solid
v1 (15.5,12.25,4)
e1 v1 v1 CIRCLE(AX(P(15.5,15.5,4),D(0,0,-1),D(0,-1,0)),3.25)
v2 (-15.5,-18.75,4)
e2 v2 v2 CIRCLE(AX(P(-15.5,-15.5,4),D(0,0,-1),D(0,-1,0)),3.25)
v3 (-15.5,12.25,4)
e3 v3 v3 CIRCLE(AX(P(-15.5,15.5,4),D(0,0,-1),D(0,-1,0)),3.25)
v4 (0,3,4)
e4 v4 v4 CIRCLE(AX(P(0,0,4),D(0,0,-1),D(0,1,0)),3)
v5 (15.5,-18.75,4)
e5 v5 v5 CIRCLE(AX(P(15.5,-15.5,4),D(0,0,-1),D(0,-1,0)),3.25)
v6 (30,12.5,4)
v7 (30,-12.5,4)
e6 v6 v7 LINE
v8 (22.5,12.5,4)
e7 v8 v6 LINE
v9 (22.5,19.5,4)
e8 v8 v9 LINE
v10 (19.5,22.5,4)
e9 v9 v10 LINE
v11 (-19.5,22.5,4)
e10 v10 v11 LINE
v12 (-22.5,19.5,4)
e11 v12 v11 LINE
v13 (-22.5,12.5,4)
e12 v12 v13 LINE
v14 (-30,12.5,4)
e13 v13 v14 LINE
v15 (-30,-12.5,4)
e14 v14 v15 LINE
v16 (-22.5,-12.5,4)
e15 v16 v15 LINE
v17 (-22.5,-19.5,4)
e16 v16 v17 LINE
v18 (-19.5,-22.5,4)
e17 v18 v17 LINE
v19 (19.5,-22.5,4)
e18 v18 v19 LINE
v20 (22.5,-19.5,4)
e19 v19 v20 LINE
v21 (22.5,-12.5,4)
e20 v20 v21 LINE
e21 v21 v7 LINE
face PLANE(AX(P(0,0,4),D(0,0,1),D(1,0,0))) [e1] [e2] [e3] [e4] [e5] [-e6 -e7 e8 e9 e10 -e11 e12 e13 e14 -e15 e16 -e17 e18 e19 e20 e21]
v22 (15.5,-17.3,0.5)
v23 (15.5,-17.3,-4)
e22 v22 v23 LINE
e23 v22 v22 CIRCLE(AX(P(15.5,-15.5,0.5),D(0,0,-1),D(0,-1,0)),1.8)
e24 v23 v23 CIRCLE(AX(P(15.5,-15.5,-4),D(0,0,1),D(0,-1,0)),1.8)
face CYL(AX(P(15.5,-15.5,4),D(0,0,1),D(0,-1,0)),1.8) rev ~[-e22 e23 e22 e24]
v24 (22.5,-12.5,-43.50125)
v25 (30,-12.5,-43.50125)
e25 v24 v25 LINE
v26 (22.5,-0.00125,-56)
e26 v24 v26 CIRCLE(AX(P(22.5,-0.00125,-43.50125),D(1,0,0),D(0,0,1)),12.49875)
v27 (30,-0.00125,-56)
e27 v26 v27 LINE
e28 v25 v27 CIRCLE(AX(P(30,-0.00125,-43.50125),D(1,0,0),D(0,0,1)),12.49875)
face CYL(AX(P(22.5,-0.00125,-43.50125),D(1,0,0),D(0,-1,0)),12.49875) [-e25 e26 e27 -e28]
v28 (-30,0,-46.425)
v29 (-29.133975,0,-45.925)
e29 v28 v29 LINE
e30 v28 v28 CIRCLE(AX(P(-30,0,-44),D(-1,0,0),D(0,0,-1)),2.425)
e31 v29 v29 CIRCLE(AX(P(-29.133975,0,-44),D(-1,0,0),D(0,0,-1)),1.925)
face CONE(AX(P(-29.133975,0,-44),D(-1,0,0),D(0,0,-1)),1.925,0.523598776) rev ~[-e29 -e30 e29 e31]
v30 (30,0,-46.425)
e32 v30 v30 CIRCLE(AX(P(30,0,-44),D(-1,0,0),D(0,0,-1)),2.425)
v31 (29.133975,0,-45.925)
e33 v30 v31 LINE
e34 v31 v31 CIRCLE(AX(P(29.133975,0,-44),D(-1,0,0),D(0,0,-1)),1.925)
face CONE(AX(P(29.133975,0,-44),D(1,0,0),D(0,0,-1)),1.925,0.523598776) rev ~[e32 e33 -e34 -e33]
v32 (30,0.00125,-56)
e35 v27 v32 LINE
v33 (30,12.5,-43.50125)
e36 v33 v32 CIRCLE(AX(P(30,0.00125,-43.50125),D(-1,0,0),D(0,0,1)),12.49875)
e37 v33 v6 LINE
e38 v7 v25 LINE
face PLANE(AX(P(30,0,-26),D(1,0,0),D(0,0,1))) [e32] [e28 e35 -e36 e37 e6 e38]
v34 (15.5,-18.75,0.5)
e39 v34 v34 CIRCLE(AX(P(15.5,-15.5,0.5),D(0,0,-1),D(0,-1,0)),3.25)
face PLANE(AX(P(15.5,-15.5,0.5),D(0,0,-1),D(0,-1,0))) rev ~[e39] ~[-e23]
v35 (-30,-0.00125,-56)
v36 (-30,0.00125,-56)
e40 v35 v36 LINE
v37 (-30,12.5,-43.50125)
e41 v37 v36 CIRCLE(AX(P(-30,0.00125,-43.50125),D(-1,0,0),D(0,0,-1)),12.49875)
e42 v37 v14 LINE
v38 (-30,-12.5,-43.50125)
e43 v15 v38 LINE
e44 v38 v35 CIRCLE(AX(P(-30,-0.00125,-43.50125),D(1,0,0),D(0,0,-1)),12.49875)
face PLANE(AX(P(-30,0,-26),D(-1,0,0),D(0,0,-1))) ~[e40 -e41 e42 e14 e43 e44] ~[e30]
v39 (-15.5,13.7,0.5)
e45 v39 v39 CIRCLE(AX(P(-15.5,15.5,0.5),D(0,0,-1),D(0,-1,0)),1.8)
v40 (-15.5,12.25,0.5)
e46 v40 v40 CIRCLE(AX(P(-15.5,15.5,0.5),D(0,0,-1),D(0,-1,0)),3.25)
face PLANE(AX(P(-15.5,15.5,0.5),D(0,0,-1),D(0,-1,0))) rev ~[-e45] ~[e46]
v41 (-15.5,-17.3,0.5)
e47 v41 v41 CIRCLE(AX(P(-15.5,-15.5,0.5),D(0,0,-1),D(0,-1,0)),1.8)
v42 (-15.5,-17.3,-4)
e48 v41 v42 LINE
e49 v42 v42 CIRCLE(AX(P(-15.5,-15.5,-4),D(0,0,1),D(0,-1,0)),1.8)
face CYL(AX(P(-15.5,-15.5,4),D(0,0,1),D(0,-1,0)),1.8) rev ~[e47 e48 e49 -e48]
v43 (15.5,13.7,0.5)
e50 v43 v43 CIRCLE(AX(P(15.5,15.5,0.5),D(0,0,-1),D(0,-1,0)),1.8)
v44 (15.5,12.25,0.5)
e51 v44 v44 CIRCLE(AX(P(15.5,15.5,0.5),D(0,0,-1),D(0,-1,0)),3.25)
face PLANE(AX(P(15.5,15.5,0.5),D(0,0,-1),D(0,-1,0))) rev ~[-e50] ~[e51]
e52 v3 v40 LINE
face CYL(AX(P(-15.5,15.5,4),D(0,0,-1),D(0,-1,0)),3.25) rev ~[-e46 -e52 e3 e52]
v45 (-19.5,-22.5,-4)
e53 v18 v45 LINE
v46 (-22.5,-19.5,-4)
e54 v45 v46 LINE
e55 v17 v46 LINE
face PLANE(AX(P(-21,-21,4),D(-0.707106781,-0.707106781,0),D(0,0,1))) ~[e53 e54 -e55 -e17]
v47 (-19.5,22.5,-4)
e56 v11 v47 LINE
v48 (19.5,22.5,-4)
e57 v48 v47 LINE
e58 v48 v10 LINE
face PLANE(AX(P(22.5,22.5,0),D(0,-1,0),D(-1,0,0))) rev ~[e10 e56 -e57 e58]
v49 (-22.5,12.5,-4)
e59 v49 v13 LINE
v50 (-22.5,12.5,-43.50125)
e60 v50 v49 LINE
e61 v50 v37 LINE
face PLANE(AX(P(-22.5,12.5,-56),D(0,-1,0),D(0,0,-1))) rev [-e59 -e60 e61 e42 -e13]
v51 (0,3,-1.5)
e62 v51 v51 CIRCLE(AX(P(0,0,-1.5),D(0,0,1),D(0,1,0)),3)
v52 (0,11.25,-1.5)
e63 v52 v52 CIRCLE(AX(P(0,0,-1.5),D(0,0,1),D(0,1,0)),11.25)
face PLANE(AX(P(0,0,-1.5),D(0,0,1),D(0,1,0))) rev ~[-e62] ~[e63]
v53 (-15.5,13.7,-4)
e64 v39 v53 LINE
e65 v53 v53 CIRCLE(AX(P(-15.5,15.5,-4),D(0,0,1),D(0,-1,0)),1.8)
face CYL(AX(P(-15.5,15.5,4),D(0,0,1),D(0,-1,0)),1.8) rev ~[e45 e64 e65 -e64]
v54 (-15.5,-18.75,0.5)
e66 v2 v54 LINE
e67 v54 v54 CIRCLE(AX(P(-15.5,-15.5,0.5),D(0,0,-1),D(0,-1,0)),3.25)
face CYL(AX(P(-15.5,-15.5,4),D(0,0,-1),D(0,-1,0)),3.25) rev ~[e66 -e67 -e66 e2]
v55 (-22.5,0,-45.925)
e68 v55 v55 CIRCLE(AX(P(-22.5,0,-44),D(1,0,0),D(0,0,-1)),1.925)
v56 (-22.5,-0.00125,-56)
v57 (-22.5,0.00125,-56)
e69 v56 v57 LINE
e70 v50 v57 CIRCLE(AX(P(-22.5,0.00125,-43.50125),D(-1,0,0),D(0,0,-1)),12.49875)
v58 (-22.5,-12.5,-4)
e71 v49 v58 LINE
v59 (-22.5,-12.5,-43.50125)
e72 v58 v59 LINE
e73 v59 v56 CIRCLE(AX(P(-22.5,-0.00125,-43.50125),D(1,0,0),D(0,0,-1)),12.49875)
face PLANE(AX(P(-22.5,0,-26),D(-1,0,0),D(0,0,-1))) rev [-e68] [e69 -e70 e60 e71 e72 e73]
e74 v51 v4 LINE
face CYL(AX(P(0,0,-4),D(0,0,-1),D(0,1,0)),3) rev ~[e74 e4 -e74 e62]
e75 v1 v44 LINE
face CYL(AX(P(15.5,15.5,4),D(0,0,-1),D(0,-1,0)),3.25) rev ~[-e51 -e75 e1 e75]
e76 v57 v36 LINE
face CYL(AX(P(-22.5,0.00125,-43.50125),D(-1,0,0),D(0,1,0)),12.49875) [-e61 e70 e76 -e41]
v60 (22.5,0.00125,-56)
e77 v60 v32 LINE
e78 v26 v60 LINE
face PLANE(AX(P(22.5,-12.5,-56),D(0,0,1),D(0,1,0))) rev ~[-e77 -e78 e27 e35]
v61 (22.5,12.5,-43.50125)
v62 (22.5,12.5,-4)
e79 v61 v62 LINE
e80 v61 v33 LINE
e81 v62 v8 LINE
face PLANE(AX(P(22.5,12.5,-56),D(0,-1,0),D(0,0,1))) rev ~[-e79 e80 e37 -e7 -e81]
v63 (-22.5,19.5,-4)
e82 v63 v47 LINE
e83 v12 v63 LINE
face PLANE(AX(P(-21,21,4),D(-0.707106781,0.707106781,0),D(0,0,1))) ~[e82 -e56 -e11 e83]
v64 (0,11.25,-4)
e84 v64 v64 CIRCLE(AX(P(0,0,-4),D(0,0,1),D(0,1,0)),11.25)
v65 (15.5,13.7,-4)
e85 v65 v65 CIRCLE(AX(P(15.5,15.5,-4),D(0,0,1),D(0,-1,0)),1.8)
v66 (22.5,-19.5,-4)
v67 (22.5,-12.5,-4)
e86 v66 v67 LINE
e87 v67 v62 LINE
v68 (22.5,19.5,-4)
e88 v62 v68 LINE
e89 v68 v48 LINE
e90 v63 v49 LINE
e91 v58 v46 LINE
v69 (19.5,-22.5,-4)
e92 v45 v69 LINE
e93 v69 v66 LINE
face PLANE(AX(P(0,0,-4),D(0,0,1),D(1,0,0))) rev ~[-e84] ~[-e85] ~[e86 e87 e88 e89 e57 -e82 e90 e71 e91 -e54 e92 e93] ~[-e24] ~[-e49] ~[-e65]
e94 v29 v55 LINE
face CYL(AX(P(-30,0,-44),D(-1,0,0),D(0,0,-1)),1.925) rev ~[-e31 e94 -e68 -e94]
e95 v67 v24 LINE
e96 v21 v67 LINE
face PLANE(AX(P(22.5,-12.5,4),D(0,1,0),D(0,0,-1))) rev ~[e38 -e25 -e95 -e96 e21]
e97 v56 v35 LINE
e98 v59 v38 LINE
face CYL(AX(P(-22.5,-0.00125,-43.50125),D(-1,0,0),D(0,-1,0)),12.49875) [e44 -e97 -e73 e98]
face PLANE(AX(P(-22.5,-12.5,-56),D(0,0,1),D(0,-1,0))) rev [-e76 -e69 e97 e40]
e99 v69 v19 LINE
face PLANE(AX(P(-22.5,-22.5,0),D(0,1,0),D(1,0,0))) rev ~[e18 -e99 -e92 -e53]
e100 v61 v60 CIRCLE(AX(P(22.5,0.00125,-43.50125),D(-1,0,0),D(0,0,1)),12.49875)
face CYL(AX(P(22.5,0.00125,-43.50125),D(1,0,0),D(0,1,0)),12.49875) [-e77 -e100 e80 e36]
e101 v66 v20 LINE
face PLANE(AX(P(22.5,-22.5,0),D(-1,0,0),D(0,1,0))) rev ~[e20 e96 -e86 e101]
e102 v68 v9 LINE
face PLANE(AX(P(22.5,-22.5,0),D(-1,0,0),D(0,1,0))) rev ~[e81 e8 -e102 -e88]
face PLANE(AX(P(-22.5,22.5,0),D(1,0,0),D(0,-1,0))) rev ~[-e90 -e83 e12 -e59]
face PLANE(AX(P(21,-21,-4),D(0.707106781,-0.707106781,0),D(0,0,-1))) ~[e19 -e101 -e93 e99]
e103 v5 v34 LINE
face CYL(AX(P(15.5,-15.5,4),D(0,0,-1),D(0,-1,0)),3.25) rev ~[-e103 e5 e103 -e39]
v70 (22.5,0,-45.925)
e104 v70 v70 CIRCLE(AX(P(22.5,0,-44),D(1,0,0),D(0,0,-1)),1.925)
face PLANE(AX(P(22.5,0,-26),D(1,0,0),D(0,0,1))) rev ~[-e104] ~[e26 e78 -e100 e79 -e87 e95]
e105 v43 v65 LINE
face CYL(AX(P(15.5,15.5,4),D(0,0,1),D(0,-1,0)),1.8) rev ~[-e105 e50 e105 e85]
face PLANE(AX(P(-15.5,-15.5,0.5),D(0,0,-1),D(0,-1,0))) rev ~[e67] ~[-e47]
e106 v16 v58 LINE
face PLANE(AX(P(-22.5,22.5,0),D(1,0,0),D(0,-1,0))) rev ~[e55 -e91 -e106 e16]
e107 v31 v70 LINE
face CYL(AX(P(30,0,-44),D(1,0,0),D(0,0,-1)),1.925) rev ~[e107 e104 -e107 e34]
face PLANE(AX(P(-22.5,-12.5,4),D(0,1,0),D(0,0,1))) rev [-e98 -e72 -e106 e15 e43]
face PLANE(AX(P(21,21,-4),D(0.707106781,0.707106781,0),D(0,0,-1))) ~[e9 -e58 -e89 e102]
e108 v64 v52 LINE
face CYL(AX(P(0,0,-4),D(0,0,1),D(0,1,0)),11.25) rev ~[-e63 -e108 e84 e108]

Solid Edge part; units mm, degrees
sketch "Sketch1" plane through (0, 0, 0) normal (0, 0, 1) x (1, 0, 0)
  line L0 (-22.5, -22.5) -> (22.5, -22.5)
  line L1 (22.5, -22.5) -> (22.5, 22.5)
  line L2 (22.5, 22.5) -> (-22.5, 22.5)
  line L3 (-22.5, 22.5) -> (-22.5, -22.5)
  dimension "D1" = 45
extrude "Protrusion1" add sketch "Sketch1" along normal mid plane 8
hole "Hole_1" at (-15.5, 15.5, 4) direction (0, 0, -1) diameter 3.6 end up to next counterbore diameter 6.5 counterbore depth 3.5
hole "Hole1" at (15.5, 15.5, 4) direction (0, 0, -1) diameter 3.6 end up to next counterbore diameter 6.5 counterbore depth 3.5
hole "Hole2" at (-15.5, -15.5, 4) direction (0, 0, -1) diameter 3.6 end up to next counterbore diameter 6.5 counterbore depth 3.5
hole "Hole3" at (15.5, -15.5, 4) direction (0, 0, -1) diameter 3.6 end up to next counterbore diameter 6.5 counterbore depth 3.5
chamfer "Chamfer_1" distance 3 angle 45 4 edges at (-22.5, -22.5, 0) (-22.5, 22.5, 0) (22.5, 22.5, 0) (22.5, -22.5, 0)
hole "Hole_5" at (0, 0, -4) direction (0, 0, 1) diameter 6 end up to next counterbore diameter 22.5 counterbore depth 2.5
sketch "Sketch2" plane through (22.5, 0, 0) normal (1, 0, 0) x (0, -1, 0)
  line L0 (-12.5, -4) -> (12.5, -4)
  line L1 (12.5, -4) -> (12.5, 56)
  line L2 (12.5, 56) -> (-12.5, 56)
  line L3 (-12.5, 56) -> (-12.5, -4)
  dimension "D1" = 60
  dimension "D2" = 25
extrude "ExtrudedProtrusion_2" add sketch "Sketch2" along normal blind 7.5
hole "Hole_6" at (30, 0, -44) direction (-1, 0, 0) diameter 3.85 end up to next
fillet "Round_1" radius 12.5 2 edges at (26.25, -12.5, -56) (26.25, 12.5, -56)
mirror "Mirror1" about plane through (0, 0, 0) normal (1, 0, 0) of "ExtrudedProtrusion_2", "Hole_6"
fillet "Round1" radius 12.5 2 edges at (-26.25, -12.5, -56) (-26.25, 12.5, -56)
chamfer "Chamfer_2" distance 0.5 angle 60 2 edges at (-30, 1.925, -44) (30, 1.925, -44) measured on face at (30, 8.0833, -46.6) measured on face at (-30, 8.0833, -46.6)
properties material "Polyethylene, low density"
